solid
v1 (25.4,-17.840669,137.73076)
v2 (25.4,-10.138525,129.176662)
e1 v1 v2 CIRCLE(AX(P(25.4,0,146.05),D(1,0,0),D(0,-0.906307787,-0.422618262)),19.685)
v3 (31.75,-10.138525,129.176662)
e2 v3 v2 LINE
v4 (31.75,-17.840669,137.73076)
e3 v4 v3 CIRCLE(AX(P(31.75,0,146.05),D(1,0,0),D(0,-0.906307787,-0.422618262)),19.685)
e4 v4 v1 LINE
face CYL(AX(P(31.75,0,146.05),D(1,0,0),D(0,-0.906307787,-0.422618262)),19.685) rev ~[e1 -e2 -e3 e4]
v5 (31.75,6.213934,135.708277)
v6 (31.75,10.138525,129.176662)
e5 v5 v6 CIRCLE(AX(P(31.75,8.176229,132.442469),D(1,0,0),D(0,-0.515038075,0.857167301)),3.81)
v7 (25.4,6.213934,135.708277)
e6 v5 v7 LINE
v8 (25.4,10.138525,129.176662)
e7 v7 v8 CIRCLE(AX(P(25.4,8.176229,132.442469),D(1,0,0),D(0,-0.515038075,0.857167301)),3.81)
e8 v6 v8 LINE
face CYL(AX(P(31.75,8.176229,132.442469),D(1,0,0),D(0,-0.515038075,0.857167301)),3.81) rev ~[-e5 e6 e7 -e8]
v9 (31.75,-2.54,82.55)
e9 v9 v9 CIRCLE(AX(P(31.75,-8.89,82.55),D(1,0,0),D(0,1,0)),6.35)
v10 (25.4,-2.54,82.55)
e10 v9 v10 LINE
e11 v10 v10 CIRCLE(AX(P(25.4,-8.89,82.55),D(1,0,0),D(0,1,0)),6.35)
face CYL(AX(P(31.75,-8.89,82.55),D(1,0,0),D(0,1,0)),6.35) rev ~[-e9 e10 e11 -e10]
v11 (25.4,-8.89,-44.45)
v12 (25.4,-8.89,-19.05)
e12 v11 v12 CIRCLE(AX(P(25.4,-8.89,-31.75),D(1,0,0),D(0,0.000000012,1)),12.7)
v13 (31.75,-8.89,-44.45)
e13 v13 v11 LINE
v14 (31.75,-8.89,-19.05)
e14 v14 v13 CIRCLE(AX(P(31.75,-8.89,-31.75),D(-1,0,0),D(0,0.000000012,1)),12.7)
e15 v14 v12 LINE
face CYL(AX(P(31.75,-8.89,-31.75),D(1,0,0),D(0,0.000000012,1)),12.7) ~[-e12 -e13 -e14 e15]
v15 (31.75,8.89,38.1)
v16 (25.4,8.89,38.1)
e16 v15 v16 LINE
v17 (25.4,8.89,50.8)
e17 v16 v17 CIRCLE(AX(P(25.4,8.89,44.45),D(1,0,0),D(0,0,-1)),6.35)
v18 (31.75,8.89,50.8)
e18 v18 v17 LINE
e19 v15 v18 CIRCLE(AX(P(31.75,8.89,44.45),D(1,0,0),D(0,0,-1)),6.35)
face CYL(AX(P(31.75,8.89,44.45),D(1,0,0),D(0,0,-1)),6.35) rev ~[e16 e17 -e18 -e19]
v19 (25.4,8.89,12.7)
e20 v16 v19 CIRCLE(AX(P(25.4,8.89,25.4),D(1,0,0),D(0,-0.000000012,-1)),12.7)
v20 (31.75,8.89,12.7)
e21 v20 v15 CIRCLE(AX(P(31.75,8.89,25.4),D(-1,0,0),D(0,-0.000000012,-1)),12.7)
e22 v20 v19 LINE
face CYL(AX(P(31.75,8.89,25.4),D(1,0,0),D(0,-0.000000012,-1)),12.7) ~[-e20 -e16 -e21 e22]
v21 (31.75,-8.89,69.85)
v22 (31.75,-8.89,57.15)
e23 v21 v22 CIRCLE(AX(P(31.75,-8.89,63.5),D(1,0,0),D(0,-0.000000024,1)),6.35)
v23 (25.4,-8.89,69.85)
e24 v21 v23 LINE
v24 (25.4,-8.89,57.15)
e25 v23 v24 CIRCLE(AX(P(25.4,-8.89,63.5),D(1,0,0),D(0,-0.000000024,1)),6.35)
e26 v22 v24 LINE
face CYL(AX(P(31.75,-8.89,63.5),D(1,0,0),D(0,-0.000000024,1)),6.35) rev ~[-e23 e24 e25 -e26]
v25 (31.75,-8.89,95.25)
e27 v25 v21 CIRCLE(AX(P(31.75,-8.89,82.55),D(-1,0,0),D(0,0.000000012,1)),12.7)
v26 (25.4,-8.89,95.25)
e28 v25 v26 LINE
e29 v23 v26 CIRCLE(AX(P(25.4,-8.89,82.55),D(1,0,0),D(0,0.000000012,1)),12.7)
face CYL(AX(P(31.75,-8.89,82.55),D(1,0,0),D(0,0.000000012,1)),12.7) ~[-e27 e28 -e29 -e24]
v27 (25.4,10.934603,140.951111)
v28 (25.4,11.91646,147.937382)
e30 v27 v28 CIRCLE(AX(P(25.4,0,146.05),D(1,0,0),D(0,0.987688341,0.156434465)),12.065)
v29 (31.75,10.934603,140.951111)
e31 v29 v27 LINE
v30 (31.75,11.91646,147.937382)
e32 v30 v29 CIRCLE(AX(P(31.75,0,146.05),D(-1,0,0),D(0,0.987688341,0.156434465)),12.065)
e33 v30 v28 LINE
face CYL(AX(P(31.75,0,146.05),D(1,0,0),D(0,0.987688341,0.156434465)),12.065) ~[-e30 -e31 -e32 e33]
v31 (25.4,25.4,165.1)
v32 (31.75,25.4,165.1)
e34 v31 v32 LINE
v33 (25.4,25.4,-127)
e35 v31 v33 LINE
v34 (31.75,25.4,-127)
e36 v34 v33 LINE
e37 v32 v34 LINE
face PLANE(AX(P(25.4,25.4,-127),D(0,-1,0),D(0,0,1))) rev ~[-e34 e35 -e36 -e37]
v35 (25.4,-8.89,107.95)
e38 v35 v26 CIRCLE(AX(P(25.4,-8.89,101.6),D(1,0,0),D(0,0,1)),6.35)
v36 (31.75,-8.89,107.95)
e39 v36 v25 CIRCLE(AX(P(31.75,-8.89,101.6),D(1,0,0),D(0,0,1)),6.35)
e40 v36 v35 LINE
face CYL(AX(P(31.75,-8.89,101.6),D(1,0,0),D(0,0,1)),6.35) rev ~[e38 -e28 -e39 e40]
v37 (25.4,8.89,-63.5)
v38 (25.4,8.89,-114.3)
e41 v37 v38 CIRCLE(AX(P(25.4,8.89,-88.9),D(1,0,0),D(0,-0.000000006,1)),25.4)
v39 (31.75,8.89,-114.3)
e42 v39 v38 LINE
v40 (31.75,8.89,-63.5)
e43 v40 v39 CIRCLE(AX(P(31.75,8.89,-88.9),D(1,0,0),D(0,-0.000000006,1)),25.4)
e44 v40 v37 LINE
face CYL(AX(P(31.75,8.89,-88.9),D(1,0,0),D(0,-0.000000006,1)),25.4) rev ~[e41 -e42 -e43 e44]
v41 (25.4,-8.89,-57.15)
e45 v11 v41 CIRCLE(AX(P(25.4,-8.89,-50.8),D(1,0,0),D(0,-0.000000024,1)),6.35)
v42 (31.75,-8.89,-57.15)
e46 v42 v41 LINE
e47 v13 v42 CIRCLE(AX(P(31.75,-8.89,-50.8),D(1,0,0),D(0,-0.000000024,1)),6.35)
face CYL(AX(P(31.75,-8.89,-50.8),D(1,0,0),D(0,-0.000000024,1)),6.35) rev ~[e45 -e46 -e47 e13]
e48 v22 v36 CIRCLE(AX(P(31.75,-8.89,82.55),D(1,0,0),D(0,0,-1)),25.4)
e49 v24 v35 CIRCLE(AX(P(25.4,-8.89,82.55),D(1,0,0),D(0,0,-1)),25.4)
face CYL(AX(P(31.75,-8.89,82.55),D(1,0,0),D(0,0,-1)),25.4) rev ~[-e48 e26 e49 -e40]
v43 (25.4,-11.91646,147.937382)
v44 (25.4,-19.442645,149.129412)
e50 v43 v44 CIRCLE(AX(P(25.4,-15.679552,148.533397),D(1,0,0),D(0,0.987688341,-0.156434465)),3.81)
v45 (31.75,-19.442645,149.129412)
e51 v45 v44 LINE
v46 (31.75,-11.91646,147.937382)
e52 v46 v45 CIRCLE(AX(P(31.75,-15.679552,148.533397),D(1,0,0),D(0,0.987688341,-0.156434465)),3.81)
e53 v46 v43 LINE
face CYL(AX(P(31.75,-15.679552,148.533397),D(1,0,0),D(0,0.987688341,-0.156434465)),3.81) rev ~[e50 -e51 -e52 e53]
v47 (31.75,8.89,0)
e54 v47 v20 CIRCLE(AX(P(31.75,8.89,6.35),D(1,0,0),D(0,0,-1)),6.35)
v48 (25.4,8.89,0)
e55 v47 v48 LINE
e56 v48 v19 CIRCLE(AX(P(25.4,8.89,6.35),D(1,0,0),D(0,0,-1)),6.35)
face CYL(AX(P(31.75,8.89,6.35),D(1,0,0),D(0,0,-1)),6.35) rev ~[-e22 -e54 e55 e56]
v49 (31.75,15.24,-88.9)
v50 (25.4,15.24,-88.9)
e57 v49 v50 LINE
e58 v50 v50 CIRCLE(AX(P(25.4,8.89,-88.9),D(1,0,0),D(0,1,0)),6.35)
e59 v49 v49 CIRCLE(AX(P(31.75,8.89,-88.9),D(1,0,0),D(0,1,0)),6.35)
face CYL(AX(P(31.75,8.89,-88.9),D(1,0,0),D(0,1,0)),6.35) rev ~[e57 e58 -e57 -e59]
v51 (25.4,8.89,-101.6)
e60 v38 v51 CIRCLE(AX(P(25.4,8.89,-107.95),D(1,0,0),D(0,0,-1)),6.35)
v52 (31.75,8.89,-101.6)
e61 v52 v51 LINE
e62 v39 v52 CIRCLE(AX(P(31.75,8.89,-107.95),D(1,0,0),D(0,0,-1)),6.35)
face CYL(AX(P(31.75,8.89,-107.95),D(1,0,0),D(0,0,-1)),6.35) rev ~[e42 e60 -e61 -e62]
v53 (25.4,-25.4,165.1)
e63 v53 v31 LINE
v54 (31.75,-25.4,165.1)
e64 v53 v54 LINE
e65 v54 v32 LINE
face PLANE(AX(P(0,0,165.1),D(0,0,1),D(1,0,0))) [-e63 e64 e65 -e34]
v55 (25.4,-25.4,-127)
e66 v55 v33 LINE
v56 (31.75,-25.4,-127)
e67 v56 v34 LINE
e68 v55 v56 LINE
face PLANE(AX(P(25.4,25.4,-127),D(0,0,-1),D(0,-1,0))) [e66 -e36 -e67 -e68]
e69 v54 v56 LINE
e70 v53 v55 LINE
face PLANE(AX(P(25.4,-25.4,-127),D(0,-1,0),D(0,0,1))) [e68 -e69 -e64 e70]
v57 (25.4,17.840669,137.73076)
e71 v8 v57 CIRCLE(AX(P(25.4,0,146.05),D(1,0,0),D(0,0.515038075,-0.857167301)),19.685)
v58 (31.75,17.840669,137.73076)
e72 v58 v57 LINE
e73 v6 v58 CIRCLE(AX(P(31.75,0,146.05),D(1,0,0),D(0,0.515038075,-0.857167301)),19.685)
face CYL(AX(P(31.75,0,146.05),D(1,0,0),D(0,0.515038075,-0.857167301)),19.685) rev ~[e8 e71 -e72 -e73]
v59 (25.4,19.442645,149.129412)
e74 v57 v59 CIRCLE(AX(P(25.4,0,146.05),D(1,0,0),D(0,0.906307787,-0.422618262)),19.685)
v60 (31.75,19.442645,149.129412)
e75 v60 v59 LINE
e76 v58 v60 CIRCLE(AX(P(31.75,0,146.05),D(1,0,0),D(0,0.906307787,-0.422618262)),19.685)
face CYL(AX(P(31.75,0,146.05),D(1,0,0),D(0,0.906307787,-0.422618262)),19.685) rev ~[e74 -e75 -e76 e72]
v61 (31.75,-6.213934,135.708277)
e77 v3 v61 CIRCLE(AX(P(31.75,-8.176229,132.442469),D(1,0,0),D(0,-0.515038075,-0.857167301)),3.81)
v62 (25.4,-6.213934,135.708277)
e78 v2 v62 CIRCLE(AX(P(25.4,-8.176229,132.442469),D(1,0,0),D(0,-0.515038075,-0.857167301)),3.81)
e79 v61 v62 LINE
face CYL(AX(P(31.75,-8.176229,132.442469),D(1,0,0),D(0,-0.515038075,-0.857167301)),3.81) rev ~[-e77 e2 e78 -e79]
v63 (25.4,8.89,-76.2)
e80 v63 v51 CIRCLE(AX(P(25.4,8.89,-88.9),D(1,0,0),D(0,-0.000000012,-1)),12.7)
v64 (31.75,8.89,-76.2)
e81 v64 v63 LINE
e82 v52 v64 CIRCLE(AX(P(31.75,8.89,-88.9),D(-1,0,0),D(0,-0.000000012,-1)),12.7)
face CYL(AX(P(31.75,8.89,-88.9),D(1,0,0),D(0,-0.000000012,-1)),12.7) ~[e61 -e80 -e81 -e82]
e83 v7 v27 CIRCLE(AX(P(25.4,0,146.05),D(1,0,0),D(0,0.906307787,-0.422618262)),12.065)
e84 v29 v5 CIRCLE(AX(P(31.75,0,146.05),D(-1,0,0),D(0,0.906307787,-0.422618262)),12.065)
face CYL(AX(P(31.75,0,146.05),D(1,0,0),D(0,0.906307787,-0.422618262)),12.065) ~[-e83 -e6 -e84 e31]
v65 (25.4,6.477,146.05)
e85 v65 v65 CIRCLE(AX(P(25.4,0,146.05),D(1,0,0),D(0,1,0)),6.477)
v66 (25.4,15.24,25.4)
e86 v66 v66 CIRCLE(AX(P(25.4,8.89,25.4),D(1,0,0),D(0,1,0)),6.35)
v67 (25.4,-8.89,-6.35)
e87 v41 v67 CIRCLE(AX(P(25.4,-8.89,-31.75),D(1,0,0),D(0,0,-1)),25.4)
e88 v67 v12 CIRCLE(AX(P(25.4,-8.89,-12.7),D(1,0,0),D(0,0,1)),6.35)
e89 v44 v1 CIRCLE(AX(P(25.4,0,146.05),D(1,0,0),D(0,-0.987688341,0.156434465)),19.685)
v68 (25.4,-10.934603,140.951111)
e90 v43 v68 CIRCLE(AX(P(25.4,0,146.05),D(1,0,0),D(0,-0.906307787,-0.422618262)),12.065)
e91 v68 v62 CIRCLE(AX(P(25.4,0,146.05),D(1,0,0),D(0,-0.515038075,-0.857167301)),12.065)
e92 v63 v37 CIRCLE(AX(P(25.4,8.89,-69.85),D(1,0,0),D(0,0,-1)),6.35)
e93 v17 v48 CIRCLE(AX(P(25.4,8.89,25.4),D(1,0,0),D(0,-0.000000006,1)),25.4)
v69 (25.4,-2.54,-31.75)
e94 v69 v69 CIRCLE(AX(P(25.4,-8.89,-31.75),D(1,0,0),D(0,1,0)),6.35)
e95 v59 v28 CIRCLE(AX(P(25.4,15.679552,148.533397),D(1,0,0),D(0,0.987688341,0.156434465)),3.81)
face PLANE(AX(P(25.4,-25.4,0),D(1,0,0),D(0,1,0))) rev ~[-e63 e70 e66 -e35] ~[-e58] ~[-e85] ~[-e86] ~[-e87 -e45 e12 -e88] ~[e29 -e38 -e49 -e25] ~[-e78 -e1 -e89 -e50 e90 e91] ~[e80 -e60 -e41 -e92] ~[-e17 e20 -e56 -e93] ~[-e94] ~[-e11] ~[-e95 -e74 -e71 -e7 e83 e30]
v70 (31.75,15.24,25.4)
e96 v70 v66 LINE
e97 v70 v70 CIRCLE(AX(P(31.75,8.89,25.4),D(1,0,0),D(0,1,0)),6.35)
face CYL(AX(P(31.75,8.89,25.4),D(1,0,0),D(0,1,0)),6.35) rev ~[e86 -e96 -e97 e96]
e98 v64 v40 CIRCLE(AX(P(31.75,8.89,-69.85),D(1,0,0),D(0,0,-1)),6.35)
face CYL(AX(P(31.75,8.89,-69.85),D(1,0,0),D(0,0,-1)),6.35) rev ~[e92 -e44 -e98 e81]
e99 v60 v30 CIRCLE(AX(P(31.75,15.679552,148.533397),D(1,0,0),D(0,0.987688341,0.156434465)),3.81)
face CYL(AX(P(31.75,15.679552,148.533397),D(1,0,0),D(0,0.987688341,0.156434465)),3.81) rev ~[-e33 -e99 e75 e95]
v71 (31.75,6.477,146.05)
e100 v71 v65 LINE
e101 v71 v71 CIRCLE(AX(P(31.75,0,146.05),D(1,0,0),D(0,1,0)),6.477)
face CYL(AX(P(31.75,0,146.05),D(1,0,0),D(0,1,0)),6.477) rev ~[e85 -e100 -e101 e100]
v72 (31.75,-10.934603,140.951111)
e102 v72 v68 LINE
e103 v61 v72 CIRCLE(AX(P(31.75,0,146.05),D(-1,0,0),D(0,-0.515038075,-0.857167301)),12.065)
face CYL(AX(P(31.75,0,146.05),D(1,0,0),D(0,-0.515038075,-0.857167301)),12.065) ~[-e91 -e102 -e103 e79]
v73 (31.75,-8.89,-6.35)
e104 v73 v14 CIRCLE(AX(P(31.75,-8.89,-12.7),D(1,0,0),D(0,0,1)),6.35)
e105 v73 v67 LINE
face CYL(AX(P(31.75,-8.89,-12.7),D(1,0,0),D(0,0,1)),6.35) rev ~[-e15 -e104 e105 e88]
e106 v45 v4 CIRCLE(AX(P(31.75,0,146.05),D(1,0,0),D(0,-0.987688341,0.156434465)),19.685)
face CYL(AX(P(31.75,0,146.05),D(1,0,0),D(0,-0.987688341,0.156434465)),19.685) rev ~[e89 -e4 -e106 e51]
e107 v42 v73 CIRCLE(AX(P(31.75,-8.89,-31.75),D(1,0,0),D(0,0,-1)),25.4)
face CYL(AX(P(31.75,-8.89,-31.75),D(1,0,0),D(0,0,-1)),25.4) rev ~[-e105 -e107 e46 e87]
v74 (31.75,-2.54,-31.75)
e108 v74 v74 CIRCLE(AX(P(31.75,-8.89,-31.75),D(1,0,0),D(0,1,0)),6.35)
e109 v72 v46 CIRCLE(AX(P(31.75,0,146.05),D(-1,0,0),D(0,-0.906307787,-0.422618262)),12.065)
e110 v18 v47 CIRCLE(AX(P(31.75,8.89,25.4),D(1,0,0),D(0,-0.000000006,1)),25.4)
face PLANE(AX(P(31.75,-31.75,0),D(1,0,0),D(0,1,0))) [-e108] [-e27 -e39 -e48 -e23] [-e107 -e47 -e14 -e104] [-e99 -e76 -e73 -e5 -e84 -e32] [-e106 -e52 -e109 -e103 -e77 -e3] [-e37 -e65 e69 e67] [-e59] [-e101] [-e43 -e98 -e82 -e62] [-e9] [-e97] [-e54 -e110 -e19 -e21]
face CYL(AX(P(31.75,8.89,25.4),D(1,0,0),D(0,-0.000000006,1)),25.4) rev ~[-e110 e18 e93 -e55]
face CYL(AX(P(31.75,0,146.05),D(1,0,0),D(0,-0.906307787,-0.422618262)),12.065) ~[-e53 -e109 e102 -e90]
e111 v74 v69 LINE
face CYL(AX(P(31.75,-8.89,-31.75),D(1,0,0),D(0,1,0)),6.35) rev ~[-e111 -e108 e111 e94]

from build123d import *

# Parameters (mm, degrees)
F0_W      = 63.5
F0_H      = 63.5
F0_W_2    = 50.8
F0_H_2    = 50.8
F1_DEPTH  = 165.1
F3_R      = 6.477
F4_DEPTH  = 25.4
F6_DEPTH  = 25.4
F7_R      = 6.35
F8_DEPTH  = 63.501
F9_W      = 93.0855199695
F9_H      = 380.0157606602
F9_W_2    = 50.8
F9_H_2    = 292.1
F10_DEPTH = 38.1
F11_W     = 93.9574092627
F11_H     = 381.9095790386
F12_DEPTH = 91.44


# Not quite as in the source:
# - ends of sketch curves that miss each other by under 0.0002 mm in the source are joined


with BuildPart() as f1:
    # F0 (on Top) → F1 (new body, symmetric)
    with BuildSketch(Plane.XY):
        Rectangle(F0_W, F0_H)
        Rectangle(F0_W_2, F0_H_2, mode=Mode.SUBTRACT)
    extrude(amount=F1_DEPTH, both=True)

    # F3 (on face) → F4 (cut)
    with BuildSketch(Plane.YZ.offset(31.75)):
        with Locations((0, 146.05)):
            Circle(F3_R)
        with BuildLine():
            ThreePointArc((10.1385245046, 129.1766616857), (14.6288058895, 132.8781640138), (17.8406687878, 137.7307595176))
            ThreePointArc((17.8406687878, 137.7307595176), (19.4934269332, 143.3103775076), (19.4426449846, 149.1294124443))
            ThreePointArc((19.4426449846, 149.1294124443), (15.0835370951, 152.2964897102), (11.9164598293, 147.9373818207))
            ThreePointArc((11.9164598293, 147.9373818207), (11.9475842494, 144.3708765369), (10.9346034506, 140.9511106721))
            ThreePointArc((10.9346034506, 140.9511106721), (8.9660423194, 137.9769392343), (6.2139343738, 135.708276517))
            ThreePointArc((6.2139343738, 135.708276517), (4.9104220235, 130.4801740359), (10.1385245046, 129.1766616857))
        make_face()
        with BuildLine():
            ThreePointArc((-10.1385245046, 129.1766616857), (-4.9104220235, 130.4801740359), (-6.2139343738, 135.708276517))
            ThreePointArc((-6.2139343738, 135.708276517), (-8.9660423194, 137.9769392343), (-10.9346034506, 140.9511106721))
            ThreePointArc((-10.9346034506, 140.9511106721), (-11.9475842494, 144.3708765369), (-11.9164598293, 147.9373818207))
            ThreePointArc((-11.9164598293, 147.9373818207), (-15.0835370951, 152.2964897102), (-19.4426449846, 149.1294124443))
            ThreePointArc((-19.4426449846, 149.1294124443), (-19.4934269332, 143.3103775076), (-17.8406687878, 137.7307595176))
            ThreePointArc((-17.8406687878, 137.7307595176), (-14.6288058895, 132.8781640138), (-10.1385245046, 129.1766616857))
        make_face()
    extrude(amount=-F4_DEPTH, mode=Mode.SUBTRACT)

    # F5 (on face) → F6 (cut)
    with BuildSketch(Plane(origin=(-31.75, 0, 0), x_dir=(0, -1, 0), z_dir=(-1, 0, 0))):
        with BuildLine():
            ThreePointArc((-3.1401119103, 140.3850881569), (3.2873259769, 140.4692279278), (6.477, 146.05))
            ThreePointArc((6.477, 146.05), (-3.2873259769, 151.6307720722), (-3.1401119103, 140.3850881569))
        make_face()
        with BuildLine():
            ThreePointArc((-5.7913527214, 132.1654121492), (-6.0549491708, 133.1322727306), (-6.7727903948, 133.8315626913))
            ThreePointArc((-6.7727903948, 133.8315626913), (-9.3377562721, 131.1985515677), (-5.7913527214, 132.1654121492))
        make_face()
        with BuildLine():
            ThreePointArc((3.1226517792, 134.3961049058), (0.4285749428, 129.7298269458), (5.0948529028, 127.0357501095))
            ThreePointArc((5.0948529028, 127.0357501095), (17.8406687878, 137.7307595176), (17.8406687878, 154.3692404824))
            ThreePointArc((17.8406687878, 154.3692404824), (12.777460542, 156.2120975737), (10.9346034506, 151.1488893279))
            ThreePointArc((10.9346034506, 151.1488893279), (10.9346034506, 140.9511106721), (3.1226517792, 134.3961049058))
        make_face()
    extrude(amount=-F6_DEPTH, mode=Mode.SUBTRACT)

    # F7 (on face) → F8 (cut, through all)
    with BuildSketch(Plane.YZ.offset(31.75)):
        with BuildLine():
            ThreePointArc((-8.89, 107.949999693), (-15.239999693, 101.6), (-8.89, 95.250000307))
            ThreePointArc((-8.89, 95.250000307), (3.81, 82.55), (-8.89, 69.85))
            ThreePointArc((-8.89, 69.85), (-15.239999693, 63.5), (-8.89, 57.150000307))
            ThreePointArc((-8.89, 57.150000307), (16.509999693, 82.55), (-8.89, 107.949999693))
        make_face()
        with BuildLine():
            ThreePointArc((8.89, 3.07e-07), (15.239999693, 6.35), (8.89, 12.699999693))
            ThreePointArc((8.89, 12.699999693), (-3.81, 25.4), (8.89, 38.1))
            ThreePointArc((8.89, 38.1), (15.24, 44.45), (8.89, 50.8))
            ThreePointArc((8.89, 50.8), (-16.509999693, 25.4), (8.89, 3.07e-07))
        make_face()
        with BuildLine():
            ThreePointArc((-8.89, -6.350000307), (-15.239999693, -12.7), (-8.89, -19.049999693))
            ThreePointArc((-8.89, -19.049999693), (3.81, -31.75), (-8.89, -44.45))
            ThreePointArc((-8.89, -44.45), (-15.239999693, -50.8), (-8.89, -57.149999693))
            ThreePointArc((-8.89, -57.149999693), (16.509999693, -31.75), (-8.89, -6.350000307))
        make_face()
        with BuildLine():
            ThreePointArc((8.89, -114.299999693), (15.239999693, -107.95), (8.89, -101.600000307))
            ThreePointArc((8.89, -101.600000307), (-3.81, -88.9), (8.89, -76.2))
            ThreePointArc((8.89, -76.2), (15.24, -69.85), (8.89, -63.5))
            ThreePointArc((8.89, -63.5), (-16.509999693, -88.9), (8.89, -114.299999693))
        make_face()
        with Locations((-8.89, 82.55)):
            Circle(F7_R)
        with Locations((8.89, 25.4)):
            Circle(F7_R)
        with Locations((8.89, -88.9)):
            Circle(F7_R)
        with Locations((-8.89, -31.75)):
            Circle(F7_R)
    extrude(amount=-F8_DEPTH, mode=Mode.SUBTRACT)

    # F9 (on face) → F10 (cut, symmetric)
    with BuildSketch(Plane(origin=(25.4, 0, 0), x_dir=(0, -1, 0), z_dir=(-1, 0, 0))):
        Rectangle(F9_W, F9_H)
        with Locations((0, 19.05)):
            Rectangle(F9_W_2, F9_H_2, mode=Mode.SUBTRACT)
    extrude(amount=F10_DEPTH, both=True, mode=Mode.SUBTRACT)

    # F11 (on face) → F12 (cut)
    with BuildSketch(Plane(origin=(25.4, 0, 0), x_dir=(0, -1, 0), z_dir=(-1, 0, 0))):
        Rectangle(F11_W, F11_H)
    extrude(amount=F12_DEPTH, mode=Mode.SUBTRACT)


solid = f1.part
